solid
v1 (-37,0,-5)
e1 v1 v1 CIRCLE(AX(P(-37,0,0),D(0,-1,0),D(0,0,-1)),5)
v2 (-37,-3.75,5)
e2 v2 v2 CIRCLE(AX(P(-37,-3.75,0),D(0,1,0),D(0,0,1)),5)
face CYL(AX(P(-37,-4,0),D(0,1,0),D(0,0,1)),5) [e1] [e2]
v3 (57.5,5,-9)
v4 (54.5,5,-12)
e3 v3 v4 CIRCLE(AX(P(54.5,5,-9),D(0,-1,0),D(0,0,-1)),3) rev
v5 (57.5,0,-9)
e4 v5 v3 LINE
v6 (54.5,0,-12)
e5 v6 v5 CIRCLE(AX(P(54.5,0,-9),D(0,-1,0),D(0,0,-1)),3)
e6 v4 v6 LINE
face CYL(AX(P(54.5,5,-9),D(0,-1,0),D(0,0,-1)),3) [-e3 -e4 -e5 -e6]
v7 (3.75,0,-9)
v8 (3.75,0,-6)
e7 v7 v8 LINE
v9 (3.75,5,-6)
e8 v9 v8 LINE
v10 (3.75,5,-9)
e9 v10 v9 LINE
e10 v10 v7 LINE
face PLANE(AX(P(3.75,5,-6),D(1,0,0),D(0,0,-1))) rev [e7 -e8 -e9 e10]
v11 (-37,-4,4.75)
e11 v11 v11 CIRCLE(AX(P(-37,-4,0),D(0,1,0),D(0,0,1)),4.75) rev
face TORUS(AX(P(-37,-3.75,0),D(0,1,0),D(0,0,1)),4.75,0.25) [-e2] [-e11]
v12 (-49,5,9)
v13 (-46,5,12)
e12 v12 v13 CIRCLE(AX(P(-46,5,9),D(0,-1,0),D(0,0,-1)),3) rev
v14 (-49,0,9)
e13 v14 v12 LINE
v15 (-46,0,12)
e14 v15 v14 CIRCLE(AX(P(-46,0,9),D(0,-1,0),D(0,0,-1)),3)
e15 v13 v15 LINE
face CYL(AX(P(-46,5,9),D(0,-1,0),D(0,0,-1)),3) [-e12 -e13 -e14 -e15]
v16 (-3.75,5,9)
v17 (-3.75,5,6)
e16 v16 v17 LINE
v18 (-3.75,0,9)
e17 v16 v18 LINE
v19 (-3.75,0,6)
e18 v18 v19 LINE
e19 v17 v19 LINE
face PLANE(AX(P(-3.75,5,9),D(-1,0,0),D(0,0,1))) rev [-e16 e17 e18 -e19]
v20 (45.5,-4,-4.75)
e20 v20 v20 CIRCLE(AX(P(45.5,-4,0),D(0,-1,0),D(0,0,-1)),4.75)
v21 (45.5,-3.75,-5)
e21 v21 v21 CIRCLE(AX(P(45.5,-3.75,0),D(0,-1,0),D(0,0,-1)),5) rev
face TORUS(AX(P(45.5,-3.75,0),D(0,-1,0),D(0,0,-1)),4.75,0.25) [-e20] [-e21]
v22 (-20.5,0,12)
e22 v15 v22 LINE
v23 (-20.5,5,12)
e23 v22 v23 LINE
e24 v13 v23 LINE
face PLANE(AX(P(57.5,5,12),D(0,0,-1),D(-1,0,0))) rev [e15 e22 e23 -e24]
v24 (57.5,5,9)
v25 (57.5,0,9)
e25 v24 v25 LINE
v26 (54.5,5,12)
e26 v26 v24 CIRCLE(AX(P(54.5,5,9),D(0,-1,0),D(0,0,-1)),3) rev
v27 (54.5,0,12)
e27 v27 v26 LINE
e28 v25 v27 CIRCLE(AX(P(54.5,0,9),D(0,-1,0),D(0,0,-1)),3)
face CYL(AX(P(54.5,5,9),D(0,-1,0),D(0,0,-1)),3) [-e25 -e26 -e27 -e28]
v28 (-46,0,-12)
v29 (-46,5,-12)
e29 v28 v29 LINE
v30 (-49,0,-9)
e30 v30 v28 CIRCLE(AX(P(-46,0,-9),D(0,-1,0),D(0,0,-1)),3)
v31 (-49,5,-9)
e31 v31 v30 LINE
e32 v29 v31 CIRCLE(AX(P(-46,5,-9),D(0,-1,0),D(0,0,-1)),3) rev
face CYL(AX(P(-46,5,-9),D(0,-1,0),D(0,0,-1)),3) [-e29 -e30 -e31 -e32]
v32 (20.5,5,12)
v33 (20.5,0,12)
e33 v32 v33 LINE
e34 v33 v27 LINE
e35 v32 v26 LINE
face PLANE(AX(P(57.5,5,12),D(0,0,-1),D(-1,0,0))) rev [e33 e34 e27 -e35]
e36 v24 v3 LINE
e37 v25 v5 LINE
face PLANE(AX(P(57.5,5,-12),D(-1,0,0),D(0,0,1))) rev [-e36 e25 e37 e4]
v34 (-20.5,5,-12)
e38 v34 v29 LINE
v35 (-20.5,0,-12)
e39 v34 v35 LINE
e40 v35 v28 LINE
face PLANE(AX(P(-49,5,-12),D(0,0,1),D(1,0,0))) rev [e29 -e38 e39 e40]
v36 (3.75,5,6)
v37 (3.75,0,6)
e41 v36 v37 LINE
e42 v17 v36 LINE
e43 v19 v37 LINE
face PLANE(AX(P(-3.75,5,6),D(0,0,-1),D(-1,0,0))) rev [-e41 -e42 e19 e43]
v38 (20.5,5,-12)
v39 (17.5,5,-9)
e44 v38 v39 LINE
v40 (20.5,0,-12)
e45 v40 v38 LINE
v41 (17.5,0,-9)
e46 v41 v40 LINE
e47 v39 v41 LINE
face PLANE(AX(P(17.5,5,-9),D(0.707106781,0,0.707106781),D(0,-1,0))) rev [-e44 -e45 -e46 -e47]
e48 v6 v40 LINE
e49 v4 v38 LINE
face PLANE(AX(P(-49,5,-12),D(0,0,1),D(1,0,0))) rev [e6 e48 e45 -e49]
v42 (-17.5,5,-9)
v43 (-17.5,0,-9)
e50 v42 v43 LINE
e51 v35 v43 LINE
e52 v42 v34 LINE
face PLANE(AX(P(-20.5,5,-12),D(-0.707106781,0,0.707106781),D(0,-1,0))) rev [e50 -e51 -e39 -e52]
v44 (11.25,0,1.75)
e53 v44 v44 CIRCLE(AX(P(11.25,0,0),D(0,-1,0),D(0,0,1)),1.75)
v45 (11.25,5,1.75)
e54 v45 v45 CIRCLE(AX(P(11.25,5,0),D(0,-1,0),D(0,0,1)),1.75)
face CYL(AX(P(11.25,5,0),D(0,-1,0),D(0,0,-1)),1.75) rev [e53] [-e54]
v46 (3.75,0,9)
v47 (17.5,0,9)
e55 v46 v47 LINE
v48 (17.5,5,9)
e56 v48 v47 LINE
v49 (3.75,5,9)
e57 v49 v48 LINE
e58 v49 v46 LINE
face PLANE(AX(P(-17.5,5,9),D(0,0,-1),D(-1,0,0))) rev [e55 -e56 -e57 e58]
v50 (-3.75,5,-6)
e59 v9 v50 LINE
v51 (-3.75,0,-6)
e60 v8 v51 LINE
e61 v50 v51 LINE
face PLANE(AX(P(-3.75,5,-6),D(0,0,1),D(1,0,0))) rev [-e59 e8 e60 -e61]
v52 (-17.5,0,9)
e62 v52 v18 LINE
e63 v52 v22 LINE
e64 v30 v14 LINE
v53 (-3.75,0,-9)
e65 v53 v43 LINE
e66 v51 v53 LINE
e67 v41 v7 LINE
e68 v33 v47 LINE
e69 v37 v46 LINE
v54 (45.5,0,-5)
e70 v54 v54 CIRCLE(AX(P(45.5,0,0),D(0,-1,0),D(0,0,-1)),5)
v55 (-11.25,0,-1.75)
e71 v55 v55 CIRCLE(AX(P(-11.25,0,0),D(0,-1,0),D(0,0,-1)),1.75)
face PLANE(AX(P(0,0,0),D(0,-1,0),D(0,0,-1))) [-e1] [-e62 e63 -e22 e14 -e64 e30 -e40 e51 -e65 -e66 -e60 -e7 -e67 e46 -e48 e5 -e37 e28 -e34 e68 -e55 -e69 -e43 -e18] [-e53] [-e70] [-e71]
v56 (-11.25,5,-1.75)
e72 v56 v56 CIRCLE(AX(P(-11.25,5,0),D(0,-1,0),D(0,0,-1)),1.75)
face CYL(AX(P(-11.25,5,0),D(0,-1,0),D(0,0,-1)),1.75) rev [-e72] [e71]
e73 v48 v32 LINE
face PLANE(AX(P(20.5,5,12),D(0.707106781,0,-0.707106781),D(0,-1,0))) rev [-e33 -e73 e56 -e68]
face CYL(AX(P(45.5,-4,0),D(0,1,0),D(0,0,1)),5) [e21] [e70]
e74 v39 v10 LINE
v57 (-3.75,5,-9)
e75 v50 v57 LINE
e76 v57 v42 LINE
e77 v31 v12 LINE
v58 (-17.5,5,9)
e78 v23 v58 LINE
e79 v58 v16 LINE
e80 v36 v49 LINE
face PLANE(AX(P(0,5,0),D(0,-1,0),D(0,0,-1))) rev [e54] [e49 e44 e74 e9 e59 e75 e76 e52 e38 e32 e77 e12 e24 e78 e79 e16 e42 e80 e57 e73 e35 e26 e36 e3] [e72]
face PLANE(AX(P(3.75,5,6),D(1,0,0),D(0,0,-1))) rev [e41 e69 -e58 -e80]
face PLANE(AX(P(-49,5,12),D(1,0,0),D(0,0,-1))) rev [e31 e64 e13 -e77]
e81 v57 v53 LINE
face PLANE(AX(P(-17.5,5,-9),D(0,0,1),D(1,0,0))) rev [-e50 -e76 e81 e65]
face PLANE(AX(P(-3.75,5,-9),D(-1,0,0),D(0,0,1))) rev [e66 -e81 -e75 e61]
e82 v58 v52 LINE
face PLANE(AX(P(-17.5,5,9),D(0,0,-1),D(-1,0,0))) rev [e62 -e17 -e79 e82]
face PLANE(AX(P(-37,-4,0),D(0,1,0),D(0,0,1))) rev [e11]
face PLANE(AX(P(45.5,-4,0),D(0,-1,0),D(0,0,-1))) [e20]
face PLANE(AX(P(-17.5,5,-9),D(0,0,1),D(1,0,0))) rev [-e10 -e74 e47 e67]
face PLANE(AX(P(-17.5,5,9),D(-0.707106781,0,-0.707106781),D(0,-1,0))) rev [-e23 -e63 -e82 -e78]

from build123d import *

# Parameters (mm, degrees)
BOSS_EXTRUDE1_DEPTH = 5
SKETCH5_R           = 5
BOSS_EXTRUDE2_DEPTH = 4
SKETCH7_W           = 35
SKETCH7_H           = 3
CUT_EXTRUDE2_DEPTH  = 59.951251047
SKETCH6_W           = 7.5
SKETCH6_H           = 3
CUT_EXTRUDE1_DEPTH  = 59.951251047
SKETCH8_R           = 1.75
CUT_EXTRUDE3_DEPTH  = 59.951251047
FILLET3_R           = 3
FILLET2_R           = 0.25
CHAMFER1_SIZE       = 3


with BuildPart() as part:
    # Sketch1 → Boss-Extrude1 (new body)
    with BuildSketch(Plane(origin=(0, 0, 0), x_dir=(1, 0, 0), z_dir=(0, 1, 0))):
        Polygon((0, 12), (57.5, 12), (57.5, -12), (0, -12), (-49, -12), (-49, 12), align=None)
    extrude(amount=BOSS_EXTRUDE1_DEPTH)

    # Sketch5 → Boss-Extrude2 (add)
    with BuildSketch(Plane(origin=(0, 0, 0), x_dir=(1, 0, 0), z_dir=(0, 1, 0))):
        with Locations(Location((-37, 0, 0), (0, 0, 270))):
            Circle(SKETCH5_R)
        with Locations(Location((45.5, 0, 0), (0, 0, 90))):
            Circle(SKETCH5_R)
    extrude(amount=-BOSS_EXTRUDE2_DEPTH)

    # Sketch7 → Cut-Extrude2 (cut, through all)
    with BuildSketch(Plane.XZ):
        with Locations((0, 10.5)):
            Rectangle(SKETCH7_W, SKETCH7_H)
        with Locations((0, -10.5)):
            Rectangle(SKETCH7_W, SKETCH7_H)
    extrude(amount=-CUT_EXTRUDE2_DEPTH, mode=Mode.SUBTRACT)

    # Sketch6 → Cut-Extrude1 (cut, through all)
    with BuildSketch(Plane.XZ):
        with Locations((0, 7.5)):
            Rectangle(SKETCH6_W, SKETCH6_H)
        with Locations((0, -7.5)):
            Rectangle(SKETCH6_W, SKETCH6_H)
    extrude(amount=-CUT_EXTRUDE1_DEPTH, mode=Mode.SUBTRACT)

    # Sketch8 → Cut-Extrude3 (cut, through all)
    with BuildSketch(Plane.XZ):
        with Locations(Location((-11.25, 0, 0), (0, 0, 270))):
            Circle(SKETCH8_R)
        with Locations(Location((11.25, 0, 0), (0, 0, 90))):
            Circle(SKETCH8_R)
    extrude(amount=-CUT_EXTRUDE3_DEPTH, mode=Mode.SUBTRACT)

    # Fillet3
    fillet3_edges = [part.edges().sort_by_distance(p)[0] for p in [
        (-49, 2.5, 12),
        (-49, 2.5, -12),
        (57.5, 2.5, -12),
        (57.5, 2.5, 12),
    ]]
    fillet(fillet3_edges, radius=FILLET3_R)

    # Fillet2
    fillet2_edges = [part.edges().sort_by_distance(p)[0] for p in [
        (-37, -4, -5),
        (45.5, -4, 5),
    ]]
    fillet(fillet2_edges, radius=FILLET2_R)

    # Chamfer1
    chamfer1_edges = [part.edges().sort_by_distance(p)[0] for p in [
        (17.5, 2.5, 12),
        (-17.5, 2.5, 12),
        (17.5, 2.5, -12),
        (-17.5, 2.5, -12),
    ]]
    chamfer(chamfer1_edges, length=CHAMFER1_SIZE - 0.0001)  # a hair under: the kernel refuses the full size


solid = part.part
